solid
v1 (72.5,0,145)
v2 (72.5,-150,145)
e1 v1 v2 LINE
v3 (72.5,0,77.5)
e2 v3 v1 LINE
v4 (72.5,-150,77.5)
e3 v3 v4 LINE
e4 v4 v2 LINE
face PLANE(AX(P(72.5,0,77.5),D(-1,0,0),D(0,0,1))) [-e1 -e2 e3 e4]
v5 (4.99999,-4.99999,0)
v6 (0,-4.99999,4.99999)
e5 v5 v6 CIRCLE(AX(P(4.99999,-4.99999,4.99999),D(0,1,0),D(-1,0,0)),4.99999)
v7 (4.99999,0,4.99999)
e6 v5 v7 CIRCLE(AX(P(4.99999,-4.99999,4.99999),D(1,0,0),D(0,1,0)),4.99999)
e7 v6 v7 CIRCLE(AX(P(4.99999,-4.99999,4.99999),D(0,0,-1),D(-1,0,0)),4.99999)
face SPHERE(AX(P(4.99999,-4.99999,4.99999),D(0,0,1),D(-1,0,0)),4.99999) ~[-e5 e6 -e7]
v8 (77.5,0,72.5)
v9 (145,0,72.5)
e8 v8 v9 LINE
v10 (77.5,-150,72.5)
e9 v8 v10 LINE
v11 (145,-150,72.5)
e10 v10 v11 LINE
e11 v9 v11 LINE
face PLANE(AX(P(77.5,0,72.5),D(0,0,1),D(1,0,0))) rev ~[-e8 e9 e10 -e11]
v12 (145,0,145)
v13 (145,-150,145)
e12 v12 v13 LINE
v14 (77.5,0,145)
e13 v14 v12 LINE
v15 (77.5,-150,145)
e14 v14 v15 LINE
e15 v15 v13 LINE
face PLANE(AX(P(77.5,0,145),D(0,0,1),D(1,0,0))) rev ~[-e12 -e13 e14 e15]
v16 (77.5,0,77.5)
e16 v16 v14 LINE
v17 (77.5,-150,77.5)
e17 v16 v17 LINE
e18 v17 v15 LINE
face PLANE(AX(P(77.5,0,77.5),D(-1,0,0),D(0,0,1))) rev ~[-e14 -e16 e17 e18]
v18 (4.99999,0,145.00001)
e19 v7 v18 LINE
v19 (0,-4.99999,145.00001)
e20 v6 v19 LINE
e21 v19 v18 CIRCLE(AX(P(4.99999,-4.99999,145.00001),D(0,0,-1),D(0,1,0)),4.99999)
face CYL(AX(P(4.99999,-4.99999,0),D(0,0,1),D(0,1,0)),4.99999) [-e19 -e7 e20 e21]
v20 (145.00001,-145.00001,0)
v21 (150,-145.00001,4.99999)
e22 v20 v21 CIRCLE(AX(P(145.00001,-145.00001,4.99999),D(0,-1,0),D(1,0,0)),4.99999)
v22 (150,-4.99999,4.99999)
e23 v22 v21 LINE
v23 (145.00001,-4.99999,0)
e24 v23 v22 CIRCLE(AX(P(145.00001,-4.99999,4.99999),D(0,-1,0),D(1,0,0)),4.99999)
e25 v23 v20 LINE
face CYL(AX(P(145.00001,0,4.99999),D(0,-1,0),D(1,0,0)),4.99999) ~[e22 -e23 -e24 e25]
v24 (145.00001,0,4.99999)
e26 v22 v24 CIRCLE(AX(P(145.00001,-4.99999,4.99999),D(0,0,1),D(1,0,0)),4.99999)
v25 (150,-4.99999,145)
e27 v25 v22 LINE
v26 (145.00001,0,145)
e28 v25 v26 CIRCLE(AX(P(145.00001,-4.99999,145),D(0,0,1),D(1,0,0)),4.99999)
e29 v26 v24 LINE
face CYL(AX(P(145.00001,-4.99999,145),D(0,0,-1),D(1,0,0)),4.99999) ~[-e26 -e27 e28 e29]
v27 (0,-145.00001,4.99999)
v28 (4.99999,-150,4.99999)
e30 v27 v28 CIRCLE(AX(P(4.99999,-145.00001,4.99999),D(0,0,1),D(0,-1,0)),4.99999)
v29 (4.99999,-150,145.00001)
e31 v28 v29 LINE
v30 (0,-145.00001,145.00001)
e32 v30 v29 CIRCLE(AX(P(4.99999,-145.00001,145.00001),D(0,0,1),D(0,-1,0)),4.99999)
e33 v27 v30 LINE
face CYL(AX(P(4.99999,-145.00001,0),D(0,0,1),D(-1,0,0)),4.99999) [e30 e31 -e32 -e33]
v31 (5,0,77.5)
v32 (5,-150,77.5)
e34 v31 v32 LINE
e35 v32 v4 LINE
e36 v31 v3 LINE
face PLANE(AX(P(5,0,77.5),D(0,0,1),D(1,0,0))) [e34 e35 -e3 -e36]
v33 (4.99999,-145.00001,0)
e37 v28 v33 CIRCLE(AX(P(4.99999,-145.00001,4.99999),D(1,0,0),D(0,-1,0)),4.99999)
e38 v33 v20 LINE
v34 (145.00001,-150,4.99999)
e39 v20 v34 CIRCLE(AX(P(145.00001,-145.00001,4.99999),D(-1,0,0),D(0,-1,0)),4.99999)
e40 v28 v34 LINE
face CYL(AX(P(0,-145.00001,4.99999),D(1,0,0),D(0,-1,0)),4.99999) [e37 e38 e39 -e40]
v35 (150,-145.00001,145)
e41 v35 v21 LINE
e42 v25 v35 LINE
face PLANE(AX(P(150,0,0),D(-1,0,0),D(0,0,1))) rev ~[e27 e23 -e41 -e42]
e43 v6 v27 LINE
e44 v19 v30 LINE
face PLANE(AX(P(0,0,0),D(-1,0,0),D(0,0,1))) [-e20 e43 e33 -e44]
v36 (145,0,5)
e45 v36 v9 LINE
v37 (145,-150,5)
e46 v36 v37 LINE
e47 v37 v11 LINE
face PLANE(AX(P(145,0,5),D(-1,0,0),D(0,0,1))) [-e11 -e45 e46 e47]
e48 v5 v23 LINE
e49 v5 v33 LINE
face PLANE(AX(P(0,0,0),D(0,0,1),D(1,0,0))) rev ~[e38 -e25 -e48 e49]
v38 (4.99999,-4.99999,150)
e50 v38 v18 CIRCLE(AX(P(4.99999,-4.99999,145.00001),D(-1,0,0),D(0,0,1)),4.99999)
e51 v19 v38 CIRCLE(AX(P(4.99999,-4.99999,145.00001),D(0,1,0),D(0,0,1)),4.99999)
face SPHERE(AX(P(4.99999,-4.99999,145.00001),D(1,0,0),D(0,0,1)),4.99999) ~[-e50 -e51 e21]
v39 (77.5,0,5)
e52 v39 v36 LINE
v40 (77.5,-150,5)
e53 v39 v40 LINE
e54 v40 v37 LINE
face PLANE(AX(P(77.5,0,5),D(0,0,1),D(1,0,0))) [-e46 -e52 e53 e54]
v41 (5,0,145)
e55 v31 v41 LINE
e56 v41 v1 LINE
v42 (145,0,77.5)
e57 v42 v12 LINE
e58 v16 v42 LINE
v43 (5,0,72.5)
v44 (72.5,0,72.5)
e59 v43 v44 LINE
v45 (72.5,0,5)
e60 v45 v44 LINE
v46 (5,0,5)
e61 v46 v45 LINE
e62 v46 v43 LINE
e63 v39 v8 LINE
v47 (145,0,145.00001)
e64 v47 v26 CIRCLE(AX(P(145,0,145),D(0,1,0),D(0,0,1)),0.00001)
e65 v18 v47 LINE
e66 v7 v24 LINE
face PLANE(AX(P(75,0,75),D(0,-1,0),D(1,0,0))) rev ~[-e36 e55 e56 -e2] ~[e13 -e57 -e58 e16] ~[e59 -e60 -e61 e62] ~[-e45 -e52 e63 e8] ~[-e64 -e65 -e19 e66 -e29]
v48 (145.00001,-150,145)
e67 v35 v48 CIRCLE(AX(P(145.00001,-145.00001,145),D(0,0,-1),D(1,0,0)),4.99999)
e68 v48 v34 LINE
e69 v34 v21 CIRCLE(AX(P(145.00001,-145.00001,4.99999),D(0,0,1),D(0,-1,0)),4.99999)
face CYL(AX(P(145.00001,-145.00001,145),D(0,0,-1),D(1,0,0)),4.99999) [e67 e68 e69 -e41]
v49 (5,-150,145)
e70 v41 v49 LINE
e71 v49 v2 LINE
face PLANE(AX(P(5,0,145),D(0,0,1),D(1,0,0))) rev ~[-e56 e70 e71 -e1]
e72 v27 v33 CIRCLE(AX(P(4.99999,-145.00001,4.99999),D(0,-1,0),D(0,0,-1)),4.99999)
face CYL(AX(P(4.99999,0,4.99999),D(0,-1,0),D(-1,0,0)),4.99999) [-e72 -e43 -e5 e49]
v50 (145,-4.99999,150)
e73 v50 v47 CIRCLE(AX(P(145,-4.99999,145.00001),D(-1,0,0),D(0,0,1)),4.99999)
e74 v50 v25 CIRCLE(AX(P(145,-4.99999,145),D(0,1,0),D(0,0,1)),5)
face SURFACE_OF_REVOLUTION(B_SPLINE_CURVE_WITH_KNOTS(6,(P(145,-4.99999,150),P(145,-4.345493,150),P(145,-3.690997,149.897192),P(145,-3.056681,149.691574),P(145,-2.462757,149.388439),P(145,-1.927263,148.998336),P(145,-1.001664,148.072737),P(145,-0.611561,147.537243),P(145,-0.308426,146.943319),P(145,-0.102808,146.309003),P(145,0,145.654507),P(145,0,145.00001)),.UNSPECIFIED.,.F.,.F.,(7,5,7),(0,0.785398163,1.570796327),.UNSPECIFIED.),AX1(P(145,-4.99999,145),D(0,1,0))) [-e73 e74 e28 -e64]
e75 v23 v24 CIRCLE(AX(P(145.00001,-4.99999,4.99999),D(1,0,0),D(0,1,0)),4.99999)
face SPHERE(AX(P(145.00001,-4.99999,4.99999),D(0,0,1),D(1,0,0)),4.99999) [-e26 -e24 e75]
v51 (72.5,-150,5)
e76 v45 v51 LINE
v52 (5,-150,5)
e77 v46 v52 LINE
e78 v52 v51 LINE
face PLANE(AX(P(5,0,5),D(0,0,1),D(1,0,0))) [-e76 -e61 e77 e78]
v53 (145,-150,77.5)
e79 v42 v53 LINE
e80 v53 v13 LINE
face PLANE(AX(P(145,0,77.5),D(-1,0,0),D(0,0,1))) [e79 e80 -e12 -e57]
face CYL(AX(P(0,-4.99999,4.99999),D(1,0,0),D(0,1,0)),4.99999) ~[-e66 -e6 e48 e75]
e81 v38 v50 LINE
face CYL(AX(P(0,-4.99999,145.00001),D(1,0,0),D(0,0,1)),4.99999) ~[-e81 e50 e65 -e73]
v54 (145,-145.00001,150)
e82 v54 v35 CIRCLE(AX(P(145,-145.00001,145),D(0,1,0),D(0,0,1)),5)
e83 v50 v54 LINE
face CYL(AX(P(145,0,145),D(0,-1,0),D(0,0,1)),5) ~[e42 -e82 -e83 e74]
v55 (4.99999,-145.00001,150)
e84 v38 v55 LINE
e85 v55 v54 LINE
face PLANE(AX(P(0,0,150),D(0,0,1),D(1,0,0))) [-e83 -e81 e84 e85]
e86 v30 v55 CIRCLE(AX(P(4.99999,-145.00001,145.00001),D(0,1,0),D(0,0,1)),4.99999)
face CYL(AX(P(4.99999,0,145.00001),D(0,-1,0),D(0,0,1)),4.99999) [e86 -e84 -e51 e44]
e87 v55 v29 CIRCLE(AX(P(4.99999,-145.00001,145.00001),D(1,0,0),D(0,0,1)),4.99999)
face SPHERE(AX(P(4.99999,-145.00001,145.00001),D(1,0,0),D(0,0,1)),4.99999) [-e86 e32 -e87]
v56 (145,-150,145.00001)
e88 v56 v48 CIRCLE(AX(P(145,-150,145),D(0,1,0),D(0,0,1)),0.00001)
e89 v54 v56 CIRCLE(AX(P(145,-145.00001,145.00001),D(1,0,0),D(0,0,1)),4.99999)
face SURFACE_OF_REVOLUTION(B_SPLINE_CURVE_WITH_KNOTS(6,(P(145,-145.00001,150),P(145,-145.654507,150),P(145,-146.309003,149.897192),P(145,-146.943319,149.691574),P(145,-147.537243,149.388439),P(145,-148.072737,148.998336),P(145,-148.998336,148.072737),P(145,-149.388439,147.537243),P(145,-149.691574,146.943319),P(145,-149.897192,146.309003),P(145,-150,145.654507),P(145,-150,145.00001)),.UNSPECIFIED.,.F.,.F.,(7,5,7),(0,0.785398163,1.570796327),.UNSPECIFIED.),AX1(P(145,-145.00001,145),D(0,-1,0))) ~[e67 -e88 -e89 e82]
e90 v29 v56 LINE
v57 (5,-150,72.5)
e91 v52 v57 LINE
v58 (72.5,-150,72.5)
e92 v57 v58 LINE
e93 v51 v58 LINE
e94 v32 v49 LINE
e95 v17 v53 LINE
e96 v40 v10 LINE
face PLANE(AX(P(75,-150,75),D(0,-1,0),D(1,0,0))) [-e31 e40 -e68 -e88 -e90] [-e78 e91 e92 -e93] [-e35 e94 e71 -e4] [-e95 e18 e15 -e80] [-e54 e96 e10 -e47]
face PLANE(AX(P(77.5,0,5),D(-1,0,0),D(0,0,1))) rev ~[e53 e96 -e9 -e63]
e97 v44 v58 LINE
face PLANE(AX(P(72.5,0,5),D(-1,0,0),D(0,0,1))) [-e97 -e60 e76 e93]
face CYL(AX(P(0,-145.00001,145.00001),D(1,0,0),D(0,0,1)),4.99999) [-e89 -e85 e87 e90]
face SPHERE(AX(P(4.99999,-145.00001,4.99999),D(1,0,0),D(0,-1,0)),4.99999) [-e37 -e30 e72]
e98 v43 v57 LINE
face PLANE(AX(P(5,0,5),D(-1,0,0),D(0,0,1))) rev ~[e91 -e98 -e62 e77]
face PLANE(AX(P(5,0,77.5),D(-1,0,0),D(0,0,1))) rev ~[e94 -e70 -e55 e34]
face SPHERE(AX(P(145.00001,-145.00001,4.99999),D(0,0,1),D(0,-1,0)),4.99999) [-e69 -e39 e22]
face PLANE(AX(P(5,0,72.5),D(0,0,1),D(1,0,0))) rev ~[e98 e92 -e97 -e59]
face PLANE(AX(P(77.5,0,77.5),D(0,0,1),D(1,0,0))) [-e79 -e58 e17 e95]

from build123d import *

# Parameters (mm, degrees)
F0_W     = 150
F0_H     = 150
F0_W_2   = 67.5
F0_H_2   = 67.5
F1_DEPTH = 150
F2_R     = 5
F3_R     = 4.99999


# Not quite as in the source:
# - a fillet or chamfer is up to 0.001 mm smaller than in the source, because OpenCascade refuses the exact size


with BuildPart() as f1:
    # F0 (on Front) → F1 (new body)
    with BuildSketch(Plane.XZ):
        with Locations((75, 75)):
            Rectangle(F0_W, F0_H)
        with Locations((38.75, 38.75)):
            Rectangle(F0_W_2, F0_H_2, mode=Mode.SUBTRACT)
        with Locations((111.25, 38.75)):
            Rectangle(F0_W_2, F0_H_2, mode=Mode.SUBTRACT)
        with Locations((38.75, 111.25)):
            Rectangle(F0_W_2, F0_H_2, mode=Mode.SUBTRACT)
        with Locations((111.25, 111.25)):
            Rectangle(F0_W_2, F0_H_2, mode=Mode.SUBTRACT)
    extrude(amount=F1_DEPTH)

    # F2
    f2_edges = [f1.edges().sort_by_distance(p)[0] for p in [
        (150, -75, 150),
    ]]
    fillet(f2_edges, radius=F2_R)

    # F3 (radius 5 in the source; OpenCascade refuses exactly that, so slightly less here)
    f3_edges = [f1.edges().sort_by_distance(p)[0] for p in [
        (72.5, -150, 150),
        (150, -150, 72.5),
        (72.5, 0, 150),
        (0, -75, 150),
        (75, -150, 0),
        (150, -75, 0),
        (0, -150, 75),
        (150, 0, 72.5),
        (0, 0, 75),
        (0, -75, 0),
        (75, 0, 0),
    ]]
    fillet(f3_edges, radius=F3_R)


solid = f1.part
